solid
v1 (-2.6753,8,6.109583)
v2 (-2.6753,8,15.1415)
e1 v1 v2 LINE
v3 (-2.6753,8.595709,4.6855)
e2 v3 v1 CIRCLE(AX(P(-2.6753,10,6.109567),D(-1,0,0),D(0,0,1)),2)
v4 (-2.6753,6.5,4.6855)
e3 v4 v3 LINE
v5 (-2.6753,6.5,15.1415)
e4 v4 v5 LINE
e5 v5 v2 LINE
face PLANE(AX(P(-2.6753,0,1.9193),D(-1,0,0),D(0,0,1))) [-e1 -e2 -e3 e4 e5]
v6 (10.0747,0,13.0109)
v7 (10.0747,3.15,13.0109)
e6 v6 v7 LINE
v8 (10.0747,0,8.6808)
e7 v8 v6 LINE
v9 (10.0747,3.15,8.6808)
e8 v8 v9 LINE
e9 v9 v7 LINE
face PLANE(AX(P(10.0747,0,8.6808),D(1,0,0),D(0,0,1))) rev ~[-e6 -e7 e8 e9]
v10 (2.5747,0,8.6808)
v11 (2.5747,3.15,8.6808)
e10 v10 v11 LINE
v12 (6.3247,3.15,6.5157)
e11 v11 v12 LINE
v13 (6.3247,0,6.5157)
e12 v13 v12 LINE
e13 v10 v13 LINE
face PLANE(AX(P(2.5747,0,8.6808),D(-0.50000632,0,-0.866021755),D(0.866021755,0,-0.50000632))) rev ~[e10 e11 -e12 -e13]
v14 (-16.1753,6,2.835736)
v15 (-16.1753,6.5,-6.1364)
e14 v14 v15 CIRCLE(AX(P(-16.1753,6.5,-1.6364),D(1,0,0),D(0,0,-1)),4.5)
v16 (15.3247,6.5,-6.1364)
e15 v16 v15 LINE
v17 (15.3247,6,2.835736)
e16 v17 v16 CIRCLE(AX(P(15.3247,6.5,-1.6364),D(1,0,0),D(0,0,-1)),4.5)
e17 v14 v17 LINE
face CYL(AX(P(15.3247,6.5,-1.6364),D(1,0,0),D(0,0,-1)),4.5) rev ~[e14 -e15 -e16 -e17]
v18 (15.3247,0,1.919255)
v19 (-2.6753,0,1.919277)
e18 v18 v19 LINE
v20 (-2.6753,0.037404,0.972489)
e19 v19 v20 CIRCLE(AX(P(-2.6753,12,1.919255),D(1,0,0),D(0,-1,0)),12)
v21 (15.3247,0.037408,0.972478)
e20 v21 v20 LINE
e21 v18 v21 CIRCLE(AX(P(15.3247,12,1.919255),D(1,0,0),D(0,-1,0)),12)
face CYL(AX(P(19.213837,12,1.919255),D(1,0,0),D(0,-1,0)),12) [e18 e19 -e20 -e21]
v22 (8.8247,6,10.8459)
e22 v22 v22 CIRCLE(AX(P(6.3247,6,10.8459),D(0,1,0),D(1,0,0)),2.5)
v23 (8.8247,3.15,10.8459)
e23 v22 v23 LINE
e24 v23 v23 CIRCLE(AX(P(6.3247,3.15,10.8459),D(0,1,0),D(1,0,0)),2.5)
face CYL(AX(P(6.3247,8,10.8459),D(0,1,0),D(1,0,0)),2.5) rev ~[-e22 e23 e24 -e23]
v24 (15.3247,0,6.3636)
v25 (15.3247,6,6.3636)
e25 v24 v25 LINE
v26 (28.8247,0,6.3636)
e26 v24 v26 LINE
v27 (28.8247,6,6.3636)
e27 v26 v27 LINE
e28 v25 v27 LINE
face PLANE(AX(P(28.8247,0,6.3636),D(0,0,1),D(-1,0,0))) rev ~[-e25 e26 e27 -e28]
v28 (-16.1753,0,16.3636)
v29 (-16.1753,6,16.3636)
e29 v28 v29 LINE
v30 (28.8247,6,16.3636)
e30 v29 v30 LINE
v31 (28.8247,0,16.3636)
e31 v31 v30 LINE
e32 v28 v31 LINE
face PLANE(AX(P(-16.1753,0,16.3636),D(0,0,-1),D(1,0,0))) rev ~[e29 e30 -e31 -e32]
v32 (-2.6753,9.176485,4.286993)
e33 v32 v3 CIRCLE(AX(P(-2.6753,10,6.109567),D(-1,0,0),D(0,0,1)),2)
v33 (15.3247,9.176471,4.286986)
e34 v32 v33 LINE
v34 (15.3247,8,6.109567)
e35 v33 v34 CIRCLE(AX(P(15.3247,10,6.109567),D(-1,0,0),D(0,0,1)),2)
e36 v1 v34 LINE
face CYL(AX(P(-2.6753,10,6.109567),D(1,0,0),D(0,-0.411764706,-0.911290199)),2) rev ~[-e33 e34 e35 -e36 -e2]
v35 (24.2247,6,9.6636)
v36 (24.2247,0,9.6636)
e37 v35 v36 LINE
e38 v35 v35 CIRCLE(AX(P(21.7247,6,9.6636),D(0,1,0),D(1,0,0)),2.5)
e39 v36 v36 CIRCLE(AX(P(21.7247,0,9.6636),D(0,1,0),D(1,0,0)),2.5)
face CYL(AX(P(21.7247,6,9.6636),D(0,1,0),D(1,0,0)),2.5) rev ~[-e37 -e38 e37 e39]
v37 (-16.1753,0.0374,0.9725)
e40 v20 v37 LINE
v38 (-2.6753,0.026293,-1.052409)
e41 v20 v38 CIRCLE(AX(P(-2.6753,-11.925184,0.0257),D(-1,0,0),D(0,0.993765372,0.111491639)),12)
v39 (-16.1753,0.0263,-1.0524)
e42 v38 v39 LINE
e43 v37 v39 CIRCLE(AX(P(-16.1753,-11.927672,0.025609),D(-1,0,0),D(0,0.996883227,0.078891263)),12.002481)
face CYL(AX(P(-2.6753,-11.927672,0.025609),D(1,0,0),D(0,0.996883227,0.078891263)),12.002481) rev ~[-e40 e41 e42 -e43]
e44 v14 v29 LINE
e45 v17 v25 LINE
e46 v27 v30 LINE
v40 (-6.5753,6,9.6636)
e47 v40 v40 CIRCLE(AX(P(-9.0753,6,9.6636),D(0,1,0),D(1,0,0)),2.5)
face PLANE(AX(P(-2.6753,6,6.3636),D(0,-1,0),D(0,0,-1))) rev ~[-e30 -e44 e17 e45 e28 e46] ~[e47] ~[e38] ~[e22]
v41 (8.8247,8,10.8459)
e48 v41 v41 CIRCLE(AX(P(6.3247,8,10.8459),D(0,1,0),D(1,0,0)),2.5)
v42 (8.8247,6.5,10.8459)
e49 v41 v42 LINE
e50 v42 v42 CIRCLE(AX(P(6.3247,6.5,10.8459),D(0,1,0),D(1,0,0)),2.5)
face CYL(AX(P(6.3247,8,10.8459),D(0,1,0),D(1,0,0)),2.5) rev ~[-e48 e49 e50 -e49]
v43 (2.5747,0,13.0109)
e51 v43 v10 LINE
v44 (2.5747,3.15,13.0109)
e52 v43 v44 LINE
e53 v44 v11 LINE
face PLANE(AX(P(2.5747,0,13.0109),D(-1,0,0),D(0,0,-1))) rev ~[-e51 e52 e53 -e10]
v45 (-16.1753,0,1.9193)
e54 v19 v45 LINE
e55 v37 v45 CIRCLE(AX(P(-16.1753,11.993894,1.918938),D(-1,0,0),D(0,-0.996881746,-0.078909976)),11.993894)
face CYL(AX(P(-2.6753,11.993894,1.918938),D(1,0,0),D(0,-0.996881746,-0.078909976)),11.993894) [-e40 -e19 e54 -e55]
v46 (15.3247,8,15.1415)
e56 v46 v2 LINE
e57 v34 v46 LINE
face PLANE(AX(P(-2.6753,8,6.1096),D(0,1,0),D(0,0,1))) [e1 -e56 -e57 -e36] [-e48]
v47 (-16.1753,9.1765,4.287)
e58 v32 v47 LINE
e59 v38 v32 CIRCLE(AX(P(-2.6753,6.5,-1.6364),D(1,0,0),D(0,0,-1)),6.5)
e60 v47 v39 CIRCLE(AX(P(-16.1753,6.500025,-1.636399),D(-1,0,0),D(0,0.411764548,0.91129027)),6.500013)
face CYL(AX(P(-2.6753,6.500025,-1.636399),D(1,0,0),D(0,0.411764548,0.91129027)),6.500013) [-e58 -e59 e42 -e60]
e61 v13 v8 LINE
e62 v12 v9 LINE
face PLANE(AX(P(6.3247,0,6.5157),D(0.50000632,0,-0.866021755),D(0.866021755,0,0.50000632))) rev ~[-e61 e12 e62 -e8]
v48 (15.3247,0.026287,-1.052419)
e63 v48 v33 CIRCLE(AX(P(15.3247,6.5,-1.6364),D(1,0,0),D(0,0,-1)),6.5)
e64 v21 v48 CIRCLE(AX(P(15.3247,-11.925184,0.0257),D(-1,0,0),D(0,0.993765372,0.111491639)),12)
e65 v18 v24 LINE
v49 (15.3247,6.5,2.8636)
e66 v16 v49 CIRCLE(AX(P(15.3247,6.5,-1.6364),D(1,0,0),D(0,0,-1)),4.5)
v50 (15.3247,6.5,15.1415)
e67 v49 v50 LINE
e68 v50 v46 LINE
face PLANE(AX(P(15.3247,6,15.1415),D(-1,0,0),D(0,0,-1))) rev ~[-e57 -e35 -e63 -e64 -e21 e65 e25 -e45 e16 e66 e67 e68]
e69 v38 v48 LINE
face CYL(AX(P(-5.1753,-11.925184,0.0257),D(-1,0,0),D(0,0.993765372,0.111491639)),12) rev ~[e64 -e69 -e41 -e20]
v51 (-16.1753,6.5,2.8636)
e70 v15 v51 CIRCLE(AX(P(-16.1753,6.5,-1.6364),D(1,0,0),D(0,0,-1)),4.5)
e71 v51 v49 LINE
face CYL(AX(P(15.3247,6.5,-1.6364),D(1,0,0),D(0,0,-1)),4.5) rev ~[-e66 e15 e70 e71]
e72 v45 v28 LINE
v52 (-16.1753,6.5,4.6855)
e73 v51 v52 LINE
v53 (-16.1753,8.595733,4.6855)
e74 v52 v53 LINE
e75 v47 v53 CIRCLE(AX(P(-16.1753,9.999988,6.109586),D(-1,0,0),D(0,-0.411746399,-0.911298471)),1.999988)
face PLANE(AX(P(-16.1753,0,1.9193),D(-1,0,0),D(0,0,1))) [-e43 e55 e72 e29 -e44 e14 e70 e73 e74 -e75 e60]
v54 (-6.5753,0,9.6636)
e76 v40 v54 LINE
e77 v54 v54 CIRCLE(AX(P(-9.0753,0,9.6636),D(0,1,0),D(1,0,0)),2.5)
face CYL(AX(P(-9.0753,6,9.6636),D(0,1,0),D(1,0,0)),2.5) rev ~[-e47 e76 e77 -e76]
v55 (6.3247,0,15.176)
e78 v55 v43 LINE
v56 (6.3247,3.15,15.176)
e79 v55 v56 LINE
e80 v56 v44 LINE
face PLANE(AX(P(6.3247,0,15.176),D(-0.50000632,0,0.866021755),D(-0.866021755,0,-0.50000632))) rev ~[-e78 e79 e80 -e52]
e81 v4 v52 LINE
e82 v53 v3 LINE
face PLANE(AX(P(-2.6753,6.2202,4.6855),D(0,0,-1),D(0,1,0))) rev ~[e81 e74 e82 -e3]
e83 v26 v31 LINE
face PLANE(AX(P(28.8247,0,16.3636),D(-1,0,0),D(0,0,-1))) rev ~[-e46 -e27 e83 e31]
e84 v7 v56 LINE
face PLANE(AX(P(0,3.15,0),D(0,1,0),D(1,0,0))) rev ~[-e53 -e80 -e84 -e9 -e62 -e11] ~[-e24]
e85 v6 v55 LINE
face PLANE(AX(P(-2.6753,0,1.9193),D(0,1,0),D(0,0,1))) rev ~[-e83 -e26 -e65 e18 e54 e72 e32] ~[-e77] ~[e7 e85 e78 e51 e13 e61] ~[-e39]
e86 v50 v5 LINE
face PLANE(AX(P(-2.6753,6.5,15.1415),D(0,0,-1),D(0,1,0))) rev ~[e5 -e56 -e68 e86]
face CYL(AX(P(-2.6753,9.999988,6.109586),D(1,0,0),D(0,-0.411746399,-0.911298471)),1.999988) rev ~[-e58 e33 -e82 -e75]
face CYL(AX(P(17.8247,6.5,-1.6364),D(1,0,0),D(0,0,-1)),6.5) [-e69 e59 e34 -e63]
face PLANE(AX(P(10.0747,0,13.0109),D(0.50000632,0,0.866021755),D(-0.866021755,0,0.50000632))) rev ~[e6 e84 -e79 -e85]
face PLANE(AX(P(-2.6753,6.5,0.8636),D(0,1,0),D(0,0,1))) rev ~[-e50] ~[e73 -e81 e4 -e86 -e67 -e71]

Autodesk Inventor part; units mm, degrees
sketch "Sketch1" plane through (0, 0, 0) normal (0, 1, 0) x (-1, 0, 0)
  line L0 (16.1753, 16.3636) -> (-28.8247, 16.3636)
  line L1 (-28.8247, 16.3636) -> (-28.8247, 6.3636)
  line L2 (16.1753, 6.3636) -> (16.1753, 16.3636)
  line L3 (-17.8247, 6.3636) -> (-17.8247, 1.3636)
  line L4 (-17.8247, 1.3636) -> (5.1753, 1.3636)
  line L5 (5.1753, 1.3636) -> (5.1753, 6.3636)
  line L6 (-28.8247, 6.3636) -> (-17.8247, 6.3636)
  line L7 (5.1753, 6.3636) -> (16.1753, 6.3636)
  point P0 (0, 0)
  dimension "d4" = 45
  dimension "d5" = 5
  dimension "d6" = 5
  dimension "d7" = 11
  dimension "d8" = 11
  dimension "d9" = 23
  dimension "d10" = 10
extrude "Extrusion1" add sketch "Sketch1" along normal blind 6
sketch "Sketch4" plane through (17.8247, 0, 6.3636) normal (1, 0, 0) x (0, 0, -1)
  circle A0 centre (8, 6.5) radius 6.5
  line L0 (0, 6) -> (5, 6) projected
  line L1 (0, 0) -> (0, 6) projected
  line L2 (0, 0) -> (5, 0) projected
  line L3 (5, 0) -> (16.9814, 0)
  point P0 (6.3636, 0)
  dimension "d20" = 13
  dimension "d36" = 8
extrude "Extrusion4" add sketch "Sketch4" against normal up to surface (23 mm away) contours A0
fillet "Fillet1" radius 12 2 edges at (6.3247, 0.7337, 1.3636) (6.3247, 0, 1.3636)
sketch "Sketch5" plane through (17.8247, 0, 6.3636) normal (1, 0, 0) x (0, 0, -1)
  circle A0 centre (8, 6.5) radius 6.5 projected
  circle A1 centre (8, 6.5) radius 2.5
  point P0 (6.3636, 0)
  point P1 (1.5193, 6)
  point P2 (7.416, 0.0263)
  dimension "d27" = 5
extrude "Extrusion5" cut sketch "Sketch5" against normal through all contours A1
ref_plane "Work Plane1" through (17.8247, 6.5, -8.1364) normal (0, 0, 1) x (1, 0, 0)
sketch "Sketch6" plane through (0, 6, 0) normal (0, 1, 0) x (1, 0, 0)
  circle A0 centre (-9.0753, -9.6636) radius 2.5
  circle A1 centre (21.7247, -9.6636) radius 2.5
  line L0 (37.8247, 8.1364) -> (-25.1753, 8.1364) projected
  line L1 (28.8247, -16.3636) -> (28.8247, -6.3636) projected
  line L2 (-16.1753, -6.3636) -> (-16.1753, -16.3636) projected
  point P0 (0, 0)
  dimension "d33" = 5
  dimension "d34" = 5
  dimension "d35" = 17.8
  dimension "d37" = 17.8
  dimension "d38" = 7.1
  dimension "d39" = 30.8
  dimension "d40" = 7.1
extrude "Extrusion6" cut sketch "Sketch6" against normal through all
move faces "Move1" translate (-2.5, 0, 0) faces at (17.8247, 2, 4.3758)
move faces "Move2" translate (2.5, 0, 0) faces at (-5.1753, 2, 4.3758) (8.4913, 6.099, -4.104)
sketch "Sketch7" plane through (0, 6, 0) normal (0, 1, 0) x (1, 0, 0)
  line L0 (-2.6753, -4.8444) -> (-2.6753, -6.3636) projected
  line L1 (-2.6753, -4.8444) -> (-2.6753, -14.145)
  line L2 (15.3247, -6.3636) -> (15.3247, -1.9193) projected
  line L3 (15.3247, -4.1415) -> (-2.6753, -4.1415)
  line L4 (-2.6753, -4.1415) -> (-2.6753, -15.1415)
  line L5 (-2.6753, -15.1415) -> (15.3247, -15.1415)
  line L6 (15.3247, -15.1415) -> (15.3247, -4.1415)
  point P0 (0, 0)
  dimension "d52" = 18
  dimension "d53" = 11
extrude "Extrusion7" add sketch "Sketch7" along normal blind 2
fillet "Fillet2" radius 2 1 edges at (6.3247, 8, 4.6882)
ref_plane "Work Plane5" through (0, 6, 0) normal (0, 1, 0) x (1, 0, 0)
sketch "Sketch8" plane through (0, 6, 0) normal (0, 1, 0) x (1, 0, 0)
  line L0 (-2.6753, -0.8636) -> (-2.6753, 4.1364) projected
  line L1 (-2.6753, -15.1415) -> (15.3247, -15.1415) projected
  line L2 (-2.6753, 0) -> (15.3247, 0)
  line L3 (15.3247, 0) -> (15.3247, -15.1415)
  line L4 (15.3247, -15.1415) -> (-2.6753, -15.1415)
  line L5 (-2.6753, -15.1415) -> (-2.6753, 0)
  point P0 (0, 0)
extrude "Extrusion8" cut sketch "Sketch8" along normal blind 0.5
ref_plane "Work Plane6" through (-2.6753, 0, 1.9193) normal (-1, 0, 0) x (0, 0, 1)
sketch "Sketch10" plane through (-2.6753, 0, 1.9193) normal (-1, 0, 0) x (0, 0, 1)
  line L0 (-1.0557, 6.5) -> (13.2222, 6.5) projected
  line L1 (13.2222, 6.5) -> (13.2222, 8) projected
  line L2 (4.1903, 8) -> (13.2222, 8) projected
  arc A0 (2.3677, 9.1765) -> (-2.9717, 0.0263) centre (-3.5557, 6.5) ccw projected
  arc A1 (-0.9468, 0.0374) -> (-2.9717, 0.0263) centre (-1.8936, -11.9252) ccw projected
  arc A2 (-0.9468, 0.0374) -> (0, 0) centre (0, 12) ccw projected
  line L3 (0, 0) -> (4.4443, 0) projected
  line L4 (4.4443, 0) -> (4.4443, 6) projected
  line L5 (4.4443, 6) -> (-1.1062, 6) projected
  arc A3 (-1.0557, 6.5) -> (-1.1062, 6) centre (-3.5557, 6.5) ccw projected
  arc A4 (2.3677, 9.1765) -> (4.1903, 8) centre (4.1903, 10) ccw projected
  point P0 (-1.9193, 0)
extrude "Extrusion9" add sketch "Sketch10" along normal up to surface (13.5 mm away)
sketch "Sketch11" plane through (-2.6753, 0, 1.9193) normal (-1, 0, 0) x (0, 0, 1)
  line L0 (2.7662, 9.2202) -> (17.7662, 9.2202)
  line L1 (17.7662, 9.2202) -> (17.7662, 6.2202)
  line L2 (17.7662, 6.2202) -> (2.7662, 6.2202)
  line L3 (2.7662, 6.2202) -> (2.7662, 9.2202)
  point P0 (-1.9193, 0)
  point P1 (-3.5557, 6.5)
  dimension "d82" = 15
  dimension "d83" = 3
sketch "Sketch12" plane through (15.3247, 0, 6.3636) normal (1, 0, 0) x (0, 0, -1)
  arc A0 (3.5, 6.5) -> (3.5, 6.5) centre (8, 6.5) ccw
  line L0 (3.5, 6.5) -> (3.5, 6.5)
  circle A1 centre (8, 6.5) radius 2.5
  circle A2 centre (8, 6.5) radius 4.5
  point P0 (6.3636, 0)
  dimension "d72" = 2
sketch "Sketch13" plane through (0, 8, 0) normal (0, 1, 0) x (1, 0, 0)
  line L0 (15.3247, -6.4035) -> (-2.6753, -6.4035) projected
  line L1 (15.3247, -15.1415) -> (15.3247, -0.8636) projected
  line L2 (-2.6753, -14.1415) -> (-2.6753, -2.35) projected
  circle A0 centre (6.3247, -10.8459) radius 2.5
  point P0 (0, 0)
  point P1 (15.3247, -3.7322)
  dimension "d68" = 5
extrude "Extrusion12" cut sketch "Sketch13" against normal through all
extrude "Extrusion13" cut sketch "Sketch12" against normal through all
extrude "Extrusion15" cut sketch "Sketch11" along normal up to surface (13.5 mm away)
ref_plane "Work Plane7" through (0, 0, 0) normal (0, 1, 0) x (1, 0, 0)
sketch "Sketch14" plane through (0, 0, 0) normal (0, 1, 0) x (1, 0, 0)
  circle A0 centre (6.3247, -10.8459) radius 2.5 projected
  line L0 (10.0747, -8.6808) -> (10.0747, -13.0109)
  line L1 (10.0747, -13.0109) -> (6.3247, -15.176)
  line L2 (6.3247, -15.176) -> (2.5747, -13.0109)
  line L3 (2.5747, -13.0109) -> (2.5747, -8.6808)
  line L4 (2.5747, -8.6808) -> (6.3247, -6.5157)
  line L5 (6.3247, -6.5157) -> (10.0747, -8.6808)
  line L6 (15.3247, -15.1415) -> (15.3247, -6.1096) projected
  point P0 (0, 0)
  dimension "d89" = 7.5
extrude "Extrusion16" cut sketch "Sketch14" along normal blind 3.15
properties part number "Cerniera 3"
